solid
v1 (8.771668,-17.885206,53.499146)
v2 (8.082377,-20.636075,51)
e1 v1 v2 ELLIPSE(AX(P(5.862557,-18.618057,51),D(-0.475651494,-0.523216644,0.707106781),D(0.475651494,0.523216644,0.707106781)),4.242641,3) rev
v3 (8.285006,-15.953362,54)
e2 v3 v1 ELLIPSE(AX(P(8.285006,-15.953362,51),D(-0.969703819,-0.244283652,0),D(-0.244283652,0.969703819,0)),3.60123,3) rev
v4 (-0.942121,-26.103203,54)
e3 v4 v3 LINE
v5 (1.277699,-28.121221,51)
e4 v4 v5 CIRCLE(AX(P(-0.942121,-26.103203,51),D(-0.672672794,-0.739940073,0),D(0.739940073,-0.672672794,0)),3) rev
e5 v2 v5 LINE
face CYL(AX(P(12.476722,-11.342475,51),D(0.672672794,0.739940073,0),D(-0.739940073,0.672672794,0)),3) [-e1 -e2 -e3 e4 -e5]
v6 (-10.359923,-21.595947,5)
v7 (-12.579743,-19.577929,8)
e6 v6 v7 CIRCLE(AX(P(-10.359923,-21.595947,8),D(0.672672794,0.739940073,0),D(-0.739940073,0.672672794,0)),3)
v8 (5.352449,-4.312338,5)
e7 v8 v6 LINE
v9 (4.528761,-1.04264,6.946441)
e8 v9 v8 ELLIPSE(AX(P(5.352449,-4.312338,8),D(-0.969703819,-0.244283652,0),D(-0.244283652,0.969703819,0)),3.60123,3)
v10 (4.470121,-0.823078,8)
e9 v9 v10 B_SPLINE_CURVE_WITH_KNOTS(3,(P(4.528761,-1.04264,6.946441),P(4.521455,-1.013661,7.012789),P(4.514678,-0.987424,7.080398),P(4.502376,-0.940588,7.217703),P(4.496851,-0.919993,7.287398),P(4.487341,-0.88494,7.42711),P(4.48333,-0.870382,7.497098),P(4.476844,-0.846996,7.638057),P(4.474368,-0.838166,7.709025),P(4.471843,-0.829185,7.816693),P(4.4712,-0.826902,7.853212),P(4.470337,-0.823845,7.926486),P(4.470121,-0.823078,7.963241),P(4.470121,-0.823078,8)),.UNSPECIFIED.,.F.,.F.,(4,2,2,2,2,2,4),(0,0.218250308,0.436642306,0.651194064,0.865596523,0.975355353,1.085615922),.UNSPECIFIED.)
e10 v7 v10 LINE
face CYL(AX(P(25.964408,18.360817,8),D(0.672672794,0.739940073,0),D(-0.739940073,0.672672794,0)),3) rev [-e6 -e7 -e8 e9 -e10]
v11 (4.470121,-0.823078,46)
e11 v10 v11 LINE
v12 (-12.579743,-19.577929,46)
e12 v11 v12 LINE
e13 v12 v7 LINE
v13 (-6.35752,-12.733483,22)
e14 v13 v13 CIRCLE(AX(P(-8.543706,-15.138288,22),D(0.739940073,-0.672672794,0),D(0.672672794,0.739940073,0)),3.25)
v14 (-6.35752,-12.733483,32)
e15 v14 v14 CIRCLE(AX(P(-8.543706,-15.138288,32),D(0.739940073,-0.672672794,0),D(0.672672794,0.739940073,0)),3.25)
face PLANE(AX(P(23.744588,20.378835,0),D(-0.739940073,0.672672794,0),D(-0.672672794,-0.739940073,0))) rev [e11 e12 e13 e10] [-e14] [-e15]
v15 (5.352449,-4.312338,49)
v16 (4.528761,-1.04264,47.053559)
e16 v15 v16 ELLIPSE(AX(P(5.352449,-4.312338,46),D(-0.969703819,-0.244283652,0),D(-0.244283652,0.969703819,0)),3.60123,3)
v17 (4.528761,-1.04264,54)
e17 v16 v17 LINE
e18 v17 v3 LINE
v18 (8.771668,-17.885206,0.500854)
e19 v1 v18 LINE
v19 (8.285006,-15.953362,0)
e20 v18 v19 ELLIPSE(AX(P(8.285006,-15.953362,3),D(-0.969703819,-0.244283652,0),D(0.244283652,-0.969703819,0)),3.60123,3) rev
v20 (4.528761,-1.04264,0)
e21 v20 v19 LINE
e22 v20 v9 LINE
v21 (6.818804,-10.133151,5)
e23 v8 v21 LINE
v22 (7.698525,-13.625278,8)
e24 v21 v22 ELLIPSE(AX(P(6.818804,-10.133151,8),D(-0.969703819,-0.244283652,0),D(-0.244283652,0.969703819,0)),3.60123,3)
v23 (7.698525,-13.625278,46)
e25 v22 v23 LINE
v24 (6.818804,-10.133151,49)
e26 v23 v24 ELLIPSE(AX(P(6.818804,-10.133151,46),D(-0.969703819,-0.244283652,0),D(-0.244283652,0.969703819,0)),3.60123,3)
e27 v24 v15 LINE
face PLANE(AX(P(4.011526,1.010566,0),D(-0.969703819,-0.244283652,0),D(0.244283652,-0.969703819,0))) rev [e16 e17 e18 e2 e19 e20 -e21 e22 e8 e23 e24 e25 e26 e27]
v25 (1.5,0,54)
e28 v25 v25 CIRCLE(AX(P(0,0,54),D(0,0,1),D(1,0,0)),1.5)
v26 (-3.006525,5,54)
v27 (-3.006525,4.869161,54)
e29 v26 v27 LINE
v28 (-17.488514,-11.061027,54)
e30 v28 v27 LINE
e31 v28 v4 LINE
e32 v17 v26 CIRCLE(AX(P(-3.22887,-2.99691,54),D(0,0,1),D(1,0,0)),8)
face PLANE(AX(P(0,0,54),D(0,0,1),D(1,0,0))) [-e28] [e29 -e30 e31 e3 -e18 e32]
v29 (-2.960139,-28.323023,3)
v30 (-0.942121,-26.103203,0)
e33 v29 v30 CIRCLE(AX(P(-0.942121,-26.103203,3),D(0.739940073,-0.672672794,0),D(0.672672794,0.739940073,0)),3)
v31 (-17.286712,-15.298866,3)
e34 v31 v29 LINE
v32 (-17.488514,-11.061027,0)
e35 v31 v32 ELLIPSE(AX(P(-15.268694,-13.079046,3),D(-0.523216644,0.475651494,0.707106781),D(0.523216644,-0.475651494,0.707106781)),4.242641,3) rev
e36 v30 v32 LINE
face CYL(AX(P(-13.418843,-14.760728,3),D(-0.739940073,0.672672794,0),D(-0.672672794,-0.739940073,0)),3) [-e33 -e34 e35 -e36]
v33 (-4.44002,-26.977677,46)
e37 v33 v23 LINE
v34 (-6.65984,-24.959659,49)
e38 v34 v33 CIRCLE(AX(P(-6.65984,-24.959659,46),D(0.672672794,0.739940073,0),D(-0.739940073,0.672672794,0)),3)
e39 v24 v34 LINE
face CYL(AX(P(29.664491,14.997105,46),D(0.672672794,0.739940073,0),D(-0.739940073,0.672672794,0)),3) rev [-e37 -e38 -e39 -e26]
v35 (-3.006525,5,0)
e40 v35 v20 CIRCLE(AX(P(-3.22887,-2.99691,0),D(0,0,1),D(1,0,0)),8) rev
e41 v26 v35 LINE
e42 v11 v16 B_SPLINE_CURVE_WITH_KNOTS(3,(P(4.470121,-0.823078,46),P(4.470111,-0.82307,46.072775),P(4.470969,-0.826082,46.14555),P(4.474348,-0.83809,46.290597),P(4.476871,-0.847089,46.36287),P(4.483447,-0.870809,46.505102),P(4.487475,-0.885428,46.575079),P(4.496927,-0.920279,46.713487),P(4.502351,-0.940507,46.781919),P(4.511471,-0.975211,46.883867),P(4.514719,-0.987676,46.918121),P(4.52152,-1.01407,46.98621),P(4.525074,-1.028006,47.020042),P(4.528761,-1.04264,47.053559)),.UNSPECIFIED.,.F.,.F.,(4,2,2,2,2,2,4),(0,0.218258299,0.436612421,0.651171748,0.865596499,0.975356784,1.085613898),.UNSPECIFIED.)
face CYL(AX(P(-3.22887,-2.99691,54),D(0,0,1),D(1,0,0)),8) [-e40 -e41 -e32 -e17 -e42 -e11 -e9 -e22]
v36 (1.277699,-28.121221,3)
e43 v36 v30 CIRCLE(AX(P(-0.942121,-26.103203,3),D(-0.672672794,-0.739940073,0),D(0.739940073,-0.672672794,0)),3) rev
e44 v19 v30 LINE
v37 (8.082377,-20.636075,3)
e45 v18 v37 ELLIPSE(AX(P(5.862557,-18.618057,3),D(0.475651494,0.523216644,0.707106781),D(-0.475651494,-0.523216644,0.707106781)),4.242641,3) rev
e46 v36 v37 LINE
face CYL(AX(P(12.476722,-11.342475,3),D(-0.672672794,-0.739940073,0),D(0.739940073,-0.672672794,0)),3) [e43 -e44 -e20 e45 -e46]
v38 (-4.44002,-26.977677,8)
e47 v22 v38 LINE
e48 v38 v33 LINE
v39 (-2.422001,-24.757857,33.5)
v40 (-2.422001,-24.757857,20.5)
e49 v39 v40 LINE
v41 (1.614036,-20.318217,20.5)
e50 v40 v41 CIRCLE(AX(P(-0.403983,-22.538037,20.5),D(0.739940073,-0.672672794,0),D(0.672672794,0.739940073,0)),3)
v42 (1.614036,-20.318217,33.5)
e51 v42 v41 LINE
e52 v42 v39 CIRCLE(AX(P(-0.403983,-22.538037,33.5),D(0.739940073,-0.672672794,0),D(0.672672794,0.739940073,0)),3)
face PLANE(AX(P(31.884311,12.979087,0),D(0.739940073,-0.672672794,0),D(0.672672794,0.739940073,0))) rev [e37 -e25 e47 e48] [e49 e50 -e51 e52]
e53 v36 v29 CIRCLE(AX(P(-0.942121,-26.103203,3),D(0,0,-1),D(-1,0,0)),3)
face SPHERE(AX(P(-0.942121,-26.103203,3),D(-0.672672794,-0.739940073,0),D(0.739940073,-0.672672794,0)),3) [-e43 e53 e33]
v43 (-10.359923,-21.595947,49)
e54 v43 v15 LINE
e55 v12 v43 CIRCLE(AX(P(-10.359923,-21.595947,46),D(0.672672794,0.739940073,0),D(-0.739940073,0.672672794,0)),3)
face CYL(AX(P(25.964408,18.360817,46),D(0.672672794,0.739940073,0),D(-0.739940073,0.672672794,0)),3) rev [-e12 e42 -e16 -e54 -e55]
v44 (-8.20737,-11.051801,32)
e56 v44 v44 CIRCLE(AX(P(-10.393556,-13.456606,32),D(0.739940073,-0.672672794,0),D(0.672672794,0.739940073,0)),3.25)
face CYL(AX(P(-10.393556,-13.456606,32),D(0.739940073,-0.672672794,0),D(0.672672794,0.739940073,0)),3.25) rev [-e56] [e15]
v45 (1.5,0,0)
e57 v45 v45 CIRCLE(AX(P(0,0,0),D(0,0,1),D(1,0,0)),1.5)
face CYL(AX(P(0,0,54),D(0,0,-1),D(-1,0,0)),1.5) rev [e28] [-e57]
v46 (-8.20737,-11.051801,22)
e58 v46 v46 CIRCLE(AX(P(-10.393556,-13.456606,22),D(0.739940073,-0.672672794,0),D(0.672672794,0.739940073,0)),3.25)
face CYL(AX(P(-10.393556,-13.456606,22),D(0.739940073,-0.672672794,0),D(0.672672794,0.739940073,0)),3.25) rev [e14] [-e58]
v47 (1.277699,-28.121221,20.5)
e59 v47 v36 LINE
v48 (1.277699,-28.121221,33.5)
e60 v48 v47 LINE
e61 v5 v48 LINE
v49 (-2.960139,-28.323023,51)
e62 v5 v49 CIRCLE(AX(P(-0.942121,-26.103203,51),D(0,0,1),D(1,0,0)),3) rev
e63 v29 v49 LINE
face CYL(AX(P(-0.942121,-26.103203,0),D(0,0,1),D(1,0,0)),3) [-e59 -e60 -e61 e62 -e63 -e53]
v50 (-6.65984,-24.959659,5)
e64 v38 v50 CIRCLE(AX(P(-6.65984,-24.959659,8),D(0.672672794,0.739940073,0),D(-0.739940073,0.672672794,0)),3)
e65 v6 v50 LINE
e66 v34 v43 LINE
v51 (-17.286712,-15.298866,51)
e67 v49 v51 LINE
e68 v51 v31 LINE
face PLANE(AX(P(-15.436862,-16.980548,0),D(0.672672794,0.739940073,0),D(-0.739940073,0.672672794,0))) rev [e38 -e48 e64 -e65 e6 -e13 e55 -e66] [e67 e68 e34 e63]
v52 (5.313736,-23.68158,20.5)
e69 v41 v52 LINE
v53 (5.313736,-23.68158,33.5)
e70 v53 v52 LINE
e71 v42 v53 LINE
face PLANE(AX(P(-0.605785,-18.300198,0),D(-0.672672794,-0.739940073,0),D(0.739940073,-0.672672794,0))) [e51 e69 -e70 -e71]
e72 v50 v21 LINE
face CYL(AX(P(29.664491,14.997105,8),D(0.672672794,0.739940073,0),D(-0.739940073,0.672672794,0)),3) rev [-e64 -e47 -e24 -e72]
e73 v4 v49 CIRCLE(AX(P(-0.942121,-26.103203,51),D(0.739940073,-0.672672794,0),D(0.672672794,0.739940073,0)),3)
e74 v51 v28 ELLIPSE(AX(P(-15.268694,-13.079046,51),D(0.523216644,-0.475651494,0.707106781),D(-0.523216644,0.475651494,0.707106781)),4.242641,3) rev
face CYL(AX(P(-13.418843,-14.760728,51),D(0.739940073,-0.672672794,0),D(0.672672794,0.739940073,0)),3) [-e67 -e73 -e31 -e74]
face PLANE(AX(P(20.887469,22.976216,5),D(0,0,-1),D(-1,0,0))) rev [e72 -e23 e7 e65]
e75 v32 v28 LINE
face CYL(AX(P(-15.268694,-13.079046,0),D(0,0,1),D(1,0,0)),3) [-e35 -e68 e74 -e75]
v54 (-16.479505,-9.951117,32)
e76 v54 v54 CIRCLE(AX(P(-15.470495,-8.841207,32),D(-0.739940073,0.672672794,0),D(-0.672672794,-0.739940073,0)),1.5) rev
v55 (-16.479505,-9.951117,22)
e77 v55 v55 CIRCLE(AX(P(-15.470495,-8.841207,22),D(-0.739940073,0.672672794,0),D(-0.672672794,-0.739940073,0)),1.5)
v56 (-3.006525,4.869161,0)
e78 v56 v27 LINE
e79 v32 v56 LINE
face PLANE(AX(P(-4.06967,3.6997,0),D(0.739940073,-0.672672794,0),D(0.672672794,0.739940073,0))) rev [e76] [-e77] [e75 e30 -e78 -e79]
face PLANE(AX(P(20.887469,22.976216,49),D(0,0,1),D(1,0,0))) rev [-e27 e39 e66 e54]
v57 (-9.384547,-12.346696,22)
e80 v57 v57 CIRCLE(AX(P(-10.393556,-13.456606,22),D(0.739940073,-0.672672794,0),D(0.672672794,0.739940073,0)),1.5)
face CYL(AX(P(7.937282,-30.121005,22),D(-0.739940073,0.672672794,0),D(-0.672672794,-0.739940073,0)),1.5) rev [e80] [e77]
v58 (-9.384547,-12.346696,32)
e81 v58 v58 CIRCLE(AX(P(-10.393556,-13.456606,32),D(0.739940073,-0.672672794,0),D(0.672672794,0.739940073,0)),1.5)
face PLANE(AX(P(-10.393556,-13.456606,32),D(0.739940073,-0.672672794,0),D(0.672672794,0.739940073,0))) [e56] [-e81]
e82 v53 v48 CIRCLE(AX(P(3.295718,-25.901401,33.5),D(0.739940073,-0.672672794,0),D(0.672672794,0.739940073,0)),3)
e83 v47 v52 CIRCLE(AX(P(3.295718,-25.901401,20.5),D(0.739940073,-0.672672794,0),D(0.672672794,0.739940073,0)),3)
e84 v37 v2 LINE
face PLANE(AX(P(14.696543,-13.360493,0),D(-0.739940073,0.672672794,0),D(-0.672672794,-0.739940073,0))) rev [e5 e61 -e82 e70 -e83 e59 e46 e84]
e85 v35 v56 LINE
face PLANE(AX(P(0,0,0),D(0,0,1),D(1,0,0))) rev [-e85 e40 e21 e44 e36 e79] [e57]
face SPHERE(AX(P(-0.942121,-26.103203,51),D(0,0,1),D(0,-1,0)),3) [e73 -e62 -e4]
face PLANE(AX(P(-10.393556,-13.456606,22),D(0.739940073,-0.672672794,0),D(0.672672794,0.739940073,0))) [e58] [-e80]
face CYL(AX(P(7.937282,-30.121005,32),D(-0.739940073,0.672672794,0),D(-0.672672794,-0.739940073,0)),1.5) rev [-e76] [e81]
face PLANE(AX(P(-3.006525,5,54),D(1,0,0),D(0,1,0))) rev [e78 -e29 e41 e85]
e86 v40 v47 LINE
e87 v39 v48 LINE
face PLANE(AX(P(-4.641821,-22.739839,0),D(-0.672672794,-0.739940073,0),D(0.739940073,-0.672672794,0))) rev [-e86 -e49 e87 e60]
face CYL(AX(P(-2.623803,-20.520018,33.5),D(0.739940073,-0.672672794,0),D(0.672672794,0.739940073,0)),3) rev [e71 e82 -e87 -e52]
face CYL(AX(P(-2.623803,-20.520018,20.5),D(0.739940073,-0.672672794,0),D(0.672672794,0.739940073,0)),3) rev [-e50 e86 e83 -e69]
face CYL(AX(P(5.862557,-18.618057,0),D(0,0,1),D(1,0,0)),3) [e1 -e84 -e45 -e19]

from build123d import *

# Parameters (mm, degrees)
SKETCH_1_W          = 6.01304928
SKETCH_1_H          = 10
SKETCH_1_R          = 1.5
EXTRUDE_1_DEPTH     = 54
EXTRUDE_2_DEPTH     = 54
SKETCH_3_W          = 11.000516989
SKETCH_3_H          = 44
CUT_EXTRUDE_1_DEPTH = 54
FILLET_1_R          = 3
SKETCH_4_R          = 1.5
CUT_EXTRUDE_2_DEPTH = 65.758340749
CUT_EXTRUDE_START   = -8
SKETCH_5_R          = 1.5
CUT_EXTRUDE_3_DEPTH = 8
CUT_EXTRUDE_START_2 = -2.5
SKETCH_6_R          = 3.25
SKETCH_6_R_2        = 1.5
CUT_EXTRUDE_4_DEPTH = 2.5
FILLET_2_R          = 8


with BuildPart() as part:
    # 草图1 → 凸台-拉伸1 (new body)
    with BuildSketch(Plane.XY):
        Rectangle(SKETCH_1_W, SKETCH_1_H)
        Circle(SKETCH_1_R, mode=Mode.SUBTRACT)
    extrude(amount=EXTRUDE_1_DEPTH)

    # 草图2 → 凸台-拉伸2 (add)
    with BuildSketch(Plane.XY.offset(54)):
        Polygon((-3.00652464, 4.869160707), (-5.333618016, 2.309357993), (-11.387673162, -4.350102667), (-19.506532138, -13.280847541), (-0.740319183, -30.341041136), (9.164728063, -19.445489164), (3.00652464, 5), (3.00652464, -5), (-3.00652464, -5), align=None)
    extrude(amount=-EXTRUDE_2_DEPTH)

    # 草图3 → 切除-拉伸1 (cut)
    with BuildSketch(Plane(origin=(-15.436861734, -16.980547908, 0), x_dir=(0.7399400733959437, -0.6726727939963125, 0), z_dir=(-0.6726727939963125, -0.7399400733959437, 0))):
        with Locations((9.361542588, 27)):
            Rectangle(SKETCH_3_W, SKETCH_3_H)
    extrude(amount=-CUT_EXTRUDE_1_DEPTH, mode=Mode.SUBTRACT)

    # 圆角1
    fillet_1_edges = [part.edges().sort_by_distance(p)[0] for p in [
        (-19.506532138, -13.280847541, 27),
        (4.21220444, -24.89326515, 54),
        (9.164728063, -19.445489164, 27),
        (-10.123425661, -21.810944338, 54),
        (-0.740319183, -30.341041136, 27),
        (4.21220444, -24.89326515, 0),
        (-10.123425661, -21.810944338, 0),
        (1.629252849, -20.301477526, 5),
        (-4.053507722, -10.199069972, 5),
        (-4.053507722, -10.199069972, 49),
        (1.629252849, -20.301477526, 49),
    ]]
    fillet(fillet_1_edges, radius=FILLET_1_R)

    # 草图4 → 切除-拉伸2 (cut, through all)
    with BuildSketch(Plane(origin=(-4.069670404, 3.699700367, 0), x_dir=(0, 0, 1), z_dir=(-0.7399400733959431, 0.6726727939963131, 0))):
        with Locations(Location((22, -16.948544778, 0), (0, 0, 270))):
            Circle(SKETCH_4_R)
        with Locations(Location((32, -16.948544778, 0), (0, 0, 270))):
            Circle(SKETCH_4_R)
    extrude(amount=-CUT_EXTRUDE_2_DEPTH, mode=Mode.SUBTRACT)

    # 草图5 → 切除-拉伸3 (cut)
    # profile 1 of 3: a face of its own
    with BuildSketch(Plane(origin=(14.696542551, -13.360493228, 0), x_dir=(0, 0, -1), z_dir=(0.7399400733959434, -0.6726727939963129, 0)).offset(CUT_EXTRUDE_START)):
        with BuildLine():
            Line((-33.5, -19.948544778), (-30.5, -19.948544778))
            ThreePointArc((-30.5, -19.948544778), (-27.5, -16.948544778), (-30.5, -13.948544778))
            Line((-30.5, -13.948544778), (-33.5, -13.948544778))
            ThreePointArc((-33.5, -13.948544778), (-36.5, -16.948544778), (-33.5, -19.948544778))
        make_face()
        with Locations(Location((-32, -16.948544778, 0), (0, 0, 270))):
            Circle(SKETCH_5_R, mode=Mode.SUBTRACT)
    # profile 2 of 3: a face of its own
    with BuildSketch(Plane(origin=(14.696542551, -13.360493228, 0), x_dir=(0, 0, -1), z_dir=(0.7399400733959434, -0.6726727939963129, 0)).offset(CUT_EXTRUDE_START)):
        with BuildLine():
            ThreePointArc((-23.5, -13.948544778), (-26.5, -16.948544778), (-23.5, -19.948544778))
            Line((-23.5, -19.948544778), (-30.5, -19.948544778))
            ThreePointArc((-30.5, -19.948544778), (-27.5, -16.948544778), (-30.5, -13.948544778))
            Line((-30.5, -13.948544778), (-23.5, -13.948544778))
        make_face()
    # profile 3 of 3: a face of its own
    with BuildSketch(Plane(origin=(14.696542551, -13.360493228, 0), x_dir=(0, 0, -1), z_dir=(0.7399400733959434, -0.6726727939963129, 0)).offset(CUT_EXTRUDE_START)):
        with BuildLine():
            Line((-23.5, -19.948544778), (-20.5, -19.948544778))
            ThreePointArc((-20.5, -19.948544778), (-17.5, -16.948544778), (-20.5, -13.948544778))
            Line((-20.5, -13.948544778), (-23.5, -13.948544778))
            ThreePointArc((-23.5, -13.948544778), (-26.5, -16.948544778), (-23.5, -19.948544778))
        make_face()
        with Locations(Location((-22, -16.948544778, 0), (0, 0, 270))):
            Circle(SKETCH_5_R, mode=Mode.SUBTRACT)
    extrude(amount=CUT_EXTRUDE_3_DEPTH, mode=Mode.SUBTRACT)

    # 草图6 → 切除-拉伸4 (cut)
    # profile 1 of 2: a face of its own
    with BuildSketch(Plane(origin=(2.857118835, -2.597380759, 0), x_dir=(0, 0, -1), z_dir=(0.7399400733959437, -0.6726727939963125, 0)).offset(CUT_EXTRUDE_START_2)):
        with Locations(Location((-32, -16.948544778, 0), (0, 0, 90))):
            Circle(SKETCH_6_R)
        with Locations(Location((-32, -16.948544778, 0), (0, 0, 270))):
            Circle(SKETCH_6_R_2, mode=Mode.SUBTRACT)
    # profile 2 of 2: a face of its own
    with BuildSketch(Plane(origin=(2.857118835, -2.597380759, 0), x_dir=(0, 0, -1), z_dir=(0.7399400733959437, -0.6726727939963125, 0)).offset(CUT_EXTRUDE_START_2)):
        with Locations(Location((-22, -16.948544778, 0), (0, 0, 90))):
            Circle(SKETCH_6_R)
        with Locations(Location((-22, -16.948544778, 0), (0, 0, 270))):
            Circle(SKETCH_6_R_2, mode=Mode.SUBTRACT)
    extrude(amount=CUT_EXTRUDE_4_DEPTH, mode=Mode.SUBTRACT)

    # 圆角2
    # the kernel refuses this fillet: 8 mm, written as the material it takes off along each edge
    with BuildSketch(Plane(origin=(3.00652464, 5, -15.578572112), x_dir=(0.24428365244033365, -0.9697038192924736, 0), z_dir=(0, 0, 1))) as fillet_2_piece_1:
        with BuildLine():
            CenterArc((6.231428845, -8), FILLET_2_R, 90, 74.267861836)
            Line((-1.468889641, -5.830876853), (-1.62289601, -5.78749439))
            ThreePointArc((-1.62289601, -5.78749439), (-0.889597431, -2.876353042), (-0.155152611, 0.039085384))
            Line((-0.155152611, 0.039085384), (0, 0.16))
            Line((0, 0.16), (6.231428845, 0.16))
            Line((6.231428845, 0.16), (6.231428845, 0))
        make_face()
    extrude(amount=85.157144223, mode=Mode.SUBTRACT)


solid = part.part
